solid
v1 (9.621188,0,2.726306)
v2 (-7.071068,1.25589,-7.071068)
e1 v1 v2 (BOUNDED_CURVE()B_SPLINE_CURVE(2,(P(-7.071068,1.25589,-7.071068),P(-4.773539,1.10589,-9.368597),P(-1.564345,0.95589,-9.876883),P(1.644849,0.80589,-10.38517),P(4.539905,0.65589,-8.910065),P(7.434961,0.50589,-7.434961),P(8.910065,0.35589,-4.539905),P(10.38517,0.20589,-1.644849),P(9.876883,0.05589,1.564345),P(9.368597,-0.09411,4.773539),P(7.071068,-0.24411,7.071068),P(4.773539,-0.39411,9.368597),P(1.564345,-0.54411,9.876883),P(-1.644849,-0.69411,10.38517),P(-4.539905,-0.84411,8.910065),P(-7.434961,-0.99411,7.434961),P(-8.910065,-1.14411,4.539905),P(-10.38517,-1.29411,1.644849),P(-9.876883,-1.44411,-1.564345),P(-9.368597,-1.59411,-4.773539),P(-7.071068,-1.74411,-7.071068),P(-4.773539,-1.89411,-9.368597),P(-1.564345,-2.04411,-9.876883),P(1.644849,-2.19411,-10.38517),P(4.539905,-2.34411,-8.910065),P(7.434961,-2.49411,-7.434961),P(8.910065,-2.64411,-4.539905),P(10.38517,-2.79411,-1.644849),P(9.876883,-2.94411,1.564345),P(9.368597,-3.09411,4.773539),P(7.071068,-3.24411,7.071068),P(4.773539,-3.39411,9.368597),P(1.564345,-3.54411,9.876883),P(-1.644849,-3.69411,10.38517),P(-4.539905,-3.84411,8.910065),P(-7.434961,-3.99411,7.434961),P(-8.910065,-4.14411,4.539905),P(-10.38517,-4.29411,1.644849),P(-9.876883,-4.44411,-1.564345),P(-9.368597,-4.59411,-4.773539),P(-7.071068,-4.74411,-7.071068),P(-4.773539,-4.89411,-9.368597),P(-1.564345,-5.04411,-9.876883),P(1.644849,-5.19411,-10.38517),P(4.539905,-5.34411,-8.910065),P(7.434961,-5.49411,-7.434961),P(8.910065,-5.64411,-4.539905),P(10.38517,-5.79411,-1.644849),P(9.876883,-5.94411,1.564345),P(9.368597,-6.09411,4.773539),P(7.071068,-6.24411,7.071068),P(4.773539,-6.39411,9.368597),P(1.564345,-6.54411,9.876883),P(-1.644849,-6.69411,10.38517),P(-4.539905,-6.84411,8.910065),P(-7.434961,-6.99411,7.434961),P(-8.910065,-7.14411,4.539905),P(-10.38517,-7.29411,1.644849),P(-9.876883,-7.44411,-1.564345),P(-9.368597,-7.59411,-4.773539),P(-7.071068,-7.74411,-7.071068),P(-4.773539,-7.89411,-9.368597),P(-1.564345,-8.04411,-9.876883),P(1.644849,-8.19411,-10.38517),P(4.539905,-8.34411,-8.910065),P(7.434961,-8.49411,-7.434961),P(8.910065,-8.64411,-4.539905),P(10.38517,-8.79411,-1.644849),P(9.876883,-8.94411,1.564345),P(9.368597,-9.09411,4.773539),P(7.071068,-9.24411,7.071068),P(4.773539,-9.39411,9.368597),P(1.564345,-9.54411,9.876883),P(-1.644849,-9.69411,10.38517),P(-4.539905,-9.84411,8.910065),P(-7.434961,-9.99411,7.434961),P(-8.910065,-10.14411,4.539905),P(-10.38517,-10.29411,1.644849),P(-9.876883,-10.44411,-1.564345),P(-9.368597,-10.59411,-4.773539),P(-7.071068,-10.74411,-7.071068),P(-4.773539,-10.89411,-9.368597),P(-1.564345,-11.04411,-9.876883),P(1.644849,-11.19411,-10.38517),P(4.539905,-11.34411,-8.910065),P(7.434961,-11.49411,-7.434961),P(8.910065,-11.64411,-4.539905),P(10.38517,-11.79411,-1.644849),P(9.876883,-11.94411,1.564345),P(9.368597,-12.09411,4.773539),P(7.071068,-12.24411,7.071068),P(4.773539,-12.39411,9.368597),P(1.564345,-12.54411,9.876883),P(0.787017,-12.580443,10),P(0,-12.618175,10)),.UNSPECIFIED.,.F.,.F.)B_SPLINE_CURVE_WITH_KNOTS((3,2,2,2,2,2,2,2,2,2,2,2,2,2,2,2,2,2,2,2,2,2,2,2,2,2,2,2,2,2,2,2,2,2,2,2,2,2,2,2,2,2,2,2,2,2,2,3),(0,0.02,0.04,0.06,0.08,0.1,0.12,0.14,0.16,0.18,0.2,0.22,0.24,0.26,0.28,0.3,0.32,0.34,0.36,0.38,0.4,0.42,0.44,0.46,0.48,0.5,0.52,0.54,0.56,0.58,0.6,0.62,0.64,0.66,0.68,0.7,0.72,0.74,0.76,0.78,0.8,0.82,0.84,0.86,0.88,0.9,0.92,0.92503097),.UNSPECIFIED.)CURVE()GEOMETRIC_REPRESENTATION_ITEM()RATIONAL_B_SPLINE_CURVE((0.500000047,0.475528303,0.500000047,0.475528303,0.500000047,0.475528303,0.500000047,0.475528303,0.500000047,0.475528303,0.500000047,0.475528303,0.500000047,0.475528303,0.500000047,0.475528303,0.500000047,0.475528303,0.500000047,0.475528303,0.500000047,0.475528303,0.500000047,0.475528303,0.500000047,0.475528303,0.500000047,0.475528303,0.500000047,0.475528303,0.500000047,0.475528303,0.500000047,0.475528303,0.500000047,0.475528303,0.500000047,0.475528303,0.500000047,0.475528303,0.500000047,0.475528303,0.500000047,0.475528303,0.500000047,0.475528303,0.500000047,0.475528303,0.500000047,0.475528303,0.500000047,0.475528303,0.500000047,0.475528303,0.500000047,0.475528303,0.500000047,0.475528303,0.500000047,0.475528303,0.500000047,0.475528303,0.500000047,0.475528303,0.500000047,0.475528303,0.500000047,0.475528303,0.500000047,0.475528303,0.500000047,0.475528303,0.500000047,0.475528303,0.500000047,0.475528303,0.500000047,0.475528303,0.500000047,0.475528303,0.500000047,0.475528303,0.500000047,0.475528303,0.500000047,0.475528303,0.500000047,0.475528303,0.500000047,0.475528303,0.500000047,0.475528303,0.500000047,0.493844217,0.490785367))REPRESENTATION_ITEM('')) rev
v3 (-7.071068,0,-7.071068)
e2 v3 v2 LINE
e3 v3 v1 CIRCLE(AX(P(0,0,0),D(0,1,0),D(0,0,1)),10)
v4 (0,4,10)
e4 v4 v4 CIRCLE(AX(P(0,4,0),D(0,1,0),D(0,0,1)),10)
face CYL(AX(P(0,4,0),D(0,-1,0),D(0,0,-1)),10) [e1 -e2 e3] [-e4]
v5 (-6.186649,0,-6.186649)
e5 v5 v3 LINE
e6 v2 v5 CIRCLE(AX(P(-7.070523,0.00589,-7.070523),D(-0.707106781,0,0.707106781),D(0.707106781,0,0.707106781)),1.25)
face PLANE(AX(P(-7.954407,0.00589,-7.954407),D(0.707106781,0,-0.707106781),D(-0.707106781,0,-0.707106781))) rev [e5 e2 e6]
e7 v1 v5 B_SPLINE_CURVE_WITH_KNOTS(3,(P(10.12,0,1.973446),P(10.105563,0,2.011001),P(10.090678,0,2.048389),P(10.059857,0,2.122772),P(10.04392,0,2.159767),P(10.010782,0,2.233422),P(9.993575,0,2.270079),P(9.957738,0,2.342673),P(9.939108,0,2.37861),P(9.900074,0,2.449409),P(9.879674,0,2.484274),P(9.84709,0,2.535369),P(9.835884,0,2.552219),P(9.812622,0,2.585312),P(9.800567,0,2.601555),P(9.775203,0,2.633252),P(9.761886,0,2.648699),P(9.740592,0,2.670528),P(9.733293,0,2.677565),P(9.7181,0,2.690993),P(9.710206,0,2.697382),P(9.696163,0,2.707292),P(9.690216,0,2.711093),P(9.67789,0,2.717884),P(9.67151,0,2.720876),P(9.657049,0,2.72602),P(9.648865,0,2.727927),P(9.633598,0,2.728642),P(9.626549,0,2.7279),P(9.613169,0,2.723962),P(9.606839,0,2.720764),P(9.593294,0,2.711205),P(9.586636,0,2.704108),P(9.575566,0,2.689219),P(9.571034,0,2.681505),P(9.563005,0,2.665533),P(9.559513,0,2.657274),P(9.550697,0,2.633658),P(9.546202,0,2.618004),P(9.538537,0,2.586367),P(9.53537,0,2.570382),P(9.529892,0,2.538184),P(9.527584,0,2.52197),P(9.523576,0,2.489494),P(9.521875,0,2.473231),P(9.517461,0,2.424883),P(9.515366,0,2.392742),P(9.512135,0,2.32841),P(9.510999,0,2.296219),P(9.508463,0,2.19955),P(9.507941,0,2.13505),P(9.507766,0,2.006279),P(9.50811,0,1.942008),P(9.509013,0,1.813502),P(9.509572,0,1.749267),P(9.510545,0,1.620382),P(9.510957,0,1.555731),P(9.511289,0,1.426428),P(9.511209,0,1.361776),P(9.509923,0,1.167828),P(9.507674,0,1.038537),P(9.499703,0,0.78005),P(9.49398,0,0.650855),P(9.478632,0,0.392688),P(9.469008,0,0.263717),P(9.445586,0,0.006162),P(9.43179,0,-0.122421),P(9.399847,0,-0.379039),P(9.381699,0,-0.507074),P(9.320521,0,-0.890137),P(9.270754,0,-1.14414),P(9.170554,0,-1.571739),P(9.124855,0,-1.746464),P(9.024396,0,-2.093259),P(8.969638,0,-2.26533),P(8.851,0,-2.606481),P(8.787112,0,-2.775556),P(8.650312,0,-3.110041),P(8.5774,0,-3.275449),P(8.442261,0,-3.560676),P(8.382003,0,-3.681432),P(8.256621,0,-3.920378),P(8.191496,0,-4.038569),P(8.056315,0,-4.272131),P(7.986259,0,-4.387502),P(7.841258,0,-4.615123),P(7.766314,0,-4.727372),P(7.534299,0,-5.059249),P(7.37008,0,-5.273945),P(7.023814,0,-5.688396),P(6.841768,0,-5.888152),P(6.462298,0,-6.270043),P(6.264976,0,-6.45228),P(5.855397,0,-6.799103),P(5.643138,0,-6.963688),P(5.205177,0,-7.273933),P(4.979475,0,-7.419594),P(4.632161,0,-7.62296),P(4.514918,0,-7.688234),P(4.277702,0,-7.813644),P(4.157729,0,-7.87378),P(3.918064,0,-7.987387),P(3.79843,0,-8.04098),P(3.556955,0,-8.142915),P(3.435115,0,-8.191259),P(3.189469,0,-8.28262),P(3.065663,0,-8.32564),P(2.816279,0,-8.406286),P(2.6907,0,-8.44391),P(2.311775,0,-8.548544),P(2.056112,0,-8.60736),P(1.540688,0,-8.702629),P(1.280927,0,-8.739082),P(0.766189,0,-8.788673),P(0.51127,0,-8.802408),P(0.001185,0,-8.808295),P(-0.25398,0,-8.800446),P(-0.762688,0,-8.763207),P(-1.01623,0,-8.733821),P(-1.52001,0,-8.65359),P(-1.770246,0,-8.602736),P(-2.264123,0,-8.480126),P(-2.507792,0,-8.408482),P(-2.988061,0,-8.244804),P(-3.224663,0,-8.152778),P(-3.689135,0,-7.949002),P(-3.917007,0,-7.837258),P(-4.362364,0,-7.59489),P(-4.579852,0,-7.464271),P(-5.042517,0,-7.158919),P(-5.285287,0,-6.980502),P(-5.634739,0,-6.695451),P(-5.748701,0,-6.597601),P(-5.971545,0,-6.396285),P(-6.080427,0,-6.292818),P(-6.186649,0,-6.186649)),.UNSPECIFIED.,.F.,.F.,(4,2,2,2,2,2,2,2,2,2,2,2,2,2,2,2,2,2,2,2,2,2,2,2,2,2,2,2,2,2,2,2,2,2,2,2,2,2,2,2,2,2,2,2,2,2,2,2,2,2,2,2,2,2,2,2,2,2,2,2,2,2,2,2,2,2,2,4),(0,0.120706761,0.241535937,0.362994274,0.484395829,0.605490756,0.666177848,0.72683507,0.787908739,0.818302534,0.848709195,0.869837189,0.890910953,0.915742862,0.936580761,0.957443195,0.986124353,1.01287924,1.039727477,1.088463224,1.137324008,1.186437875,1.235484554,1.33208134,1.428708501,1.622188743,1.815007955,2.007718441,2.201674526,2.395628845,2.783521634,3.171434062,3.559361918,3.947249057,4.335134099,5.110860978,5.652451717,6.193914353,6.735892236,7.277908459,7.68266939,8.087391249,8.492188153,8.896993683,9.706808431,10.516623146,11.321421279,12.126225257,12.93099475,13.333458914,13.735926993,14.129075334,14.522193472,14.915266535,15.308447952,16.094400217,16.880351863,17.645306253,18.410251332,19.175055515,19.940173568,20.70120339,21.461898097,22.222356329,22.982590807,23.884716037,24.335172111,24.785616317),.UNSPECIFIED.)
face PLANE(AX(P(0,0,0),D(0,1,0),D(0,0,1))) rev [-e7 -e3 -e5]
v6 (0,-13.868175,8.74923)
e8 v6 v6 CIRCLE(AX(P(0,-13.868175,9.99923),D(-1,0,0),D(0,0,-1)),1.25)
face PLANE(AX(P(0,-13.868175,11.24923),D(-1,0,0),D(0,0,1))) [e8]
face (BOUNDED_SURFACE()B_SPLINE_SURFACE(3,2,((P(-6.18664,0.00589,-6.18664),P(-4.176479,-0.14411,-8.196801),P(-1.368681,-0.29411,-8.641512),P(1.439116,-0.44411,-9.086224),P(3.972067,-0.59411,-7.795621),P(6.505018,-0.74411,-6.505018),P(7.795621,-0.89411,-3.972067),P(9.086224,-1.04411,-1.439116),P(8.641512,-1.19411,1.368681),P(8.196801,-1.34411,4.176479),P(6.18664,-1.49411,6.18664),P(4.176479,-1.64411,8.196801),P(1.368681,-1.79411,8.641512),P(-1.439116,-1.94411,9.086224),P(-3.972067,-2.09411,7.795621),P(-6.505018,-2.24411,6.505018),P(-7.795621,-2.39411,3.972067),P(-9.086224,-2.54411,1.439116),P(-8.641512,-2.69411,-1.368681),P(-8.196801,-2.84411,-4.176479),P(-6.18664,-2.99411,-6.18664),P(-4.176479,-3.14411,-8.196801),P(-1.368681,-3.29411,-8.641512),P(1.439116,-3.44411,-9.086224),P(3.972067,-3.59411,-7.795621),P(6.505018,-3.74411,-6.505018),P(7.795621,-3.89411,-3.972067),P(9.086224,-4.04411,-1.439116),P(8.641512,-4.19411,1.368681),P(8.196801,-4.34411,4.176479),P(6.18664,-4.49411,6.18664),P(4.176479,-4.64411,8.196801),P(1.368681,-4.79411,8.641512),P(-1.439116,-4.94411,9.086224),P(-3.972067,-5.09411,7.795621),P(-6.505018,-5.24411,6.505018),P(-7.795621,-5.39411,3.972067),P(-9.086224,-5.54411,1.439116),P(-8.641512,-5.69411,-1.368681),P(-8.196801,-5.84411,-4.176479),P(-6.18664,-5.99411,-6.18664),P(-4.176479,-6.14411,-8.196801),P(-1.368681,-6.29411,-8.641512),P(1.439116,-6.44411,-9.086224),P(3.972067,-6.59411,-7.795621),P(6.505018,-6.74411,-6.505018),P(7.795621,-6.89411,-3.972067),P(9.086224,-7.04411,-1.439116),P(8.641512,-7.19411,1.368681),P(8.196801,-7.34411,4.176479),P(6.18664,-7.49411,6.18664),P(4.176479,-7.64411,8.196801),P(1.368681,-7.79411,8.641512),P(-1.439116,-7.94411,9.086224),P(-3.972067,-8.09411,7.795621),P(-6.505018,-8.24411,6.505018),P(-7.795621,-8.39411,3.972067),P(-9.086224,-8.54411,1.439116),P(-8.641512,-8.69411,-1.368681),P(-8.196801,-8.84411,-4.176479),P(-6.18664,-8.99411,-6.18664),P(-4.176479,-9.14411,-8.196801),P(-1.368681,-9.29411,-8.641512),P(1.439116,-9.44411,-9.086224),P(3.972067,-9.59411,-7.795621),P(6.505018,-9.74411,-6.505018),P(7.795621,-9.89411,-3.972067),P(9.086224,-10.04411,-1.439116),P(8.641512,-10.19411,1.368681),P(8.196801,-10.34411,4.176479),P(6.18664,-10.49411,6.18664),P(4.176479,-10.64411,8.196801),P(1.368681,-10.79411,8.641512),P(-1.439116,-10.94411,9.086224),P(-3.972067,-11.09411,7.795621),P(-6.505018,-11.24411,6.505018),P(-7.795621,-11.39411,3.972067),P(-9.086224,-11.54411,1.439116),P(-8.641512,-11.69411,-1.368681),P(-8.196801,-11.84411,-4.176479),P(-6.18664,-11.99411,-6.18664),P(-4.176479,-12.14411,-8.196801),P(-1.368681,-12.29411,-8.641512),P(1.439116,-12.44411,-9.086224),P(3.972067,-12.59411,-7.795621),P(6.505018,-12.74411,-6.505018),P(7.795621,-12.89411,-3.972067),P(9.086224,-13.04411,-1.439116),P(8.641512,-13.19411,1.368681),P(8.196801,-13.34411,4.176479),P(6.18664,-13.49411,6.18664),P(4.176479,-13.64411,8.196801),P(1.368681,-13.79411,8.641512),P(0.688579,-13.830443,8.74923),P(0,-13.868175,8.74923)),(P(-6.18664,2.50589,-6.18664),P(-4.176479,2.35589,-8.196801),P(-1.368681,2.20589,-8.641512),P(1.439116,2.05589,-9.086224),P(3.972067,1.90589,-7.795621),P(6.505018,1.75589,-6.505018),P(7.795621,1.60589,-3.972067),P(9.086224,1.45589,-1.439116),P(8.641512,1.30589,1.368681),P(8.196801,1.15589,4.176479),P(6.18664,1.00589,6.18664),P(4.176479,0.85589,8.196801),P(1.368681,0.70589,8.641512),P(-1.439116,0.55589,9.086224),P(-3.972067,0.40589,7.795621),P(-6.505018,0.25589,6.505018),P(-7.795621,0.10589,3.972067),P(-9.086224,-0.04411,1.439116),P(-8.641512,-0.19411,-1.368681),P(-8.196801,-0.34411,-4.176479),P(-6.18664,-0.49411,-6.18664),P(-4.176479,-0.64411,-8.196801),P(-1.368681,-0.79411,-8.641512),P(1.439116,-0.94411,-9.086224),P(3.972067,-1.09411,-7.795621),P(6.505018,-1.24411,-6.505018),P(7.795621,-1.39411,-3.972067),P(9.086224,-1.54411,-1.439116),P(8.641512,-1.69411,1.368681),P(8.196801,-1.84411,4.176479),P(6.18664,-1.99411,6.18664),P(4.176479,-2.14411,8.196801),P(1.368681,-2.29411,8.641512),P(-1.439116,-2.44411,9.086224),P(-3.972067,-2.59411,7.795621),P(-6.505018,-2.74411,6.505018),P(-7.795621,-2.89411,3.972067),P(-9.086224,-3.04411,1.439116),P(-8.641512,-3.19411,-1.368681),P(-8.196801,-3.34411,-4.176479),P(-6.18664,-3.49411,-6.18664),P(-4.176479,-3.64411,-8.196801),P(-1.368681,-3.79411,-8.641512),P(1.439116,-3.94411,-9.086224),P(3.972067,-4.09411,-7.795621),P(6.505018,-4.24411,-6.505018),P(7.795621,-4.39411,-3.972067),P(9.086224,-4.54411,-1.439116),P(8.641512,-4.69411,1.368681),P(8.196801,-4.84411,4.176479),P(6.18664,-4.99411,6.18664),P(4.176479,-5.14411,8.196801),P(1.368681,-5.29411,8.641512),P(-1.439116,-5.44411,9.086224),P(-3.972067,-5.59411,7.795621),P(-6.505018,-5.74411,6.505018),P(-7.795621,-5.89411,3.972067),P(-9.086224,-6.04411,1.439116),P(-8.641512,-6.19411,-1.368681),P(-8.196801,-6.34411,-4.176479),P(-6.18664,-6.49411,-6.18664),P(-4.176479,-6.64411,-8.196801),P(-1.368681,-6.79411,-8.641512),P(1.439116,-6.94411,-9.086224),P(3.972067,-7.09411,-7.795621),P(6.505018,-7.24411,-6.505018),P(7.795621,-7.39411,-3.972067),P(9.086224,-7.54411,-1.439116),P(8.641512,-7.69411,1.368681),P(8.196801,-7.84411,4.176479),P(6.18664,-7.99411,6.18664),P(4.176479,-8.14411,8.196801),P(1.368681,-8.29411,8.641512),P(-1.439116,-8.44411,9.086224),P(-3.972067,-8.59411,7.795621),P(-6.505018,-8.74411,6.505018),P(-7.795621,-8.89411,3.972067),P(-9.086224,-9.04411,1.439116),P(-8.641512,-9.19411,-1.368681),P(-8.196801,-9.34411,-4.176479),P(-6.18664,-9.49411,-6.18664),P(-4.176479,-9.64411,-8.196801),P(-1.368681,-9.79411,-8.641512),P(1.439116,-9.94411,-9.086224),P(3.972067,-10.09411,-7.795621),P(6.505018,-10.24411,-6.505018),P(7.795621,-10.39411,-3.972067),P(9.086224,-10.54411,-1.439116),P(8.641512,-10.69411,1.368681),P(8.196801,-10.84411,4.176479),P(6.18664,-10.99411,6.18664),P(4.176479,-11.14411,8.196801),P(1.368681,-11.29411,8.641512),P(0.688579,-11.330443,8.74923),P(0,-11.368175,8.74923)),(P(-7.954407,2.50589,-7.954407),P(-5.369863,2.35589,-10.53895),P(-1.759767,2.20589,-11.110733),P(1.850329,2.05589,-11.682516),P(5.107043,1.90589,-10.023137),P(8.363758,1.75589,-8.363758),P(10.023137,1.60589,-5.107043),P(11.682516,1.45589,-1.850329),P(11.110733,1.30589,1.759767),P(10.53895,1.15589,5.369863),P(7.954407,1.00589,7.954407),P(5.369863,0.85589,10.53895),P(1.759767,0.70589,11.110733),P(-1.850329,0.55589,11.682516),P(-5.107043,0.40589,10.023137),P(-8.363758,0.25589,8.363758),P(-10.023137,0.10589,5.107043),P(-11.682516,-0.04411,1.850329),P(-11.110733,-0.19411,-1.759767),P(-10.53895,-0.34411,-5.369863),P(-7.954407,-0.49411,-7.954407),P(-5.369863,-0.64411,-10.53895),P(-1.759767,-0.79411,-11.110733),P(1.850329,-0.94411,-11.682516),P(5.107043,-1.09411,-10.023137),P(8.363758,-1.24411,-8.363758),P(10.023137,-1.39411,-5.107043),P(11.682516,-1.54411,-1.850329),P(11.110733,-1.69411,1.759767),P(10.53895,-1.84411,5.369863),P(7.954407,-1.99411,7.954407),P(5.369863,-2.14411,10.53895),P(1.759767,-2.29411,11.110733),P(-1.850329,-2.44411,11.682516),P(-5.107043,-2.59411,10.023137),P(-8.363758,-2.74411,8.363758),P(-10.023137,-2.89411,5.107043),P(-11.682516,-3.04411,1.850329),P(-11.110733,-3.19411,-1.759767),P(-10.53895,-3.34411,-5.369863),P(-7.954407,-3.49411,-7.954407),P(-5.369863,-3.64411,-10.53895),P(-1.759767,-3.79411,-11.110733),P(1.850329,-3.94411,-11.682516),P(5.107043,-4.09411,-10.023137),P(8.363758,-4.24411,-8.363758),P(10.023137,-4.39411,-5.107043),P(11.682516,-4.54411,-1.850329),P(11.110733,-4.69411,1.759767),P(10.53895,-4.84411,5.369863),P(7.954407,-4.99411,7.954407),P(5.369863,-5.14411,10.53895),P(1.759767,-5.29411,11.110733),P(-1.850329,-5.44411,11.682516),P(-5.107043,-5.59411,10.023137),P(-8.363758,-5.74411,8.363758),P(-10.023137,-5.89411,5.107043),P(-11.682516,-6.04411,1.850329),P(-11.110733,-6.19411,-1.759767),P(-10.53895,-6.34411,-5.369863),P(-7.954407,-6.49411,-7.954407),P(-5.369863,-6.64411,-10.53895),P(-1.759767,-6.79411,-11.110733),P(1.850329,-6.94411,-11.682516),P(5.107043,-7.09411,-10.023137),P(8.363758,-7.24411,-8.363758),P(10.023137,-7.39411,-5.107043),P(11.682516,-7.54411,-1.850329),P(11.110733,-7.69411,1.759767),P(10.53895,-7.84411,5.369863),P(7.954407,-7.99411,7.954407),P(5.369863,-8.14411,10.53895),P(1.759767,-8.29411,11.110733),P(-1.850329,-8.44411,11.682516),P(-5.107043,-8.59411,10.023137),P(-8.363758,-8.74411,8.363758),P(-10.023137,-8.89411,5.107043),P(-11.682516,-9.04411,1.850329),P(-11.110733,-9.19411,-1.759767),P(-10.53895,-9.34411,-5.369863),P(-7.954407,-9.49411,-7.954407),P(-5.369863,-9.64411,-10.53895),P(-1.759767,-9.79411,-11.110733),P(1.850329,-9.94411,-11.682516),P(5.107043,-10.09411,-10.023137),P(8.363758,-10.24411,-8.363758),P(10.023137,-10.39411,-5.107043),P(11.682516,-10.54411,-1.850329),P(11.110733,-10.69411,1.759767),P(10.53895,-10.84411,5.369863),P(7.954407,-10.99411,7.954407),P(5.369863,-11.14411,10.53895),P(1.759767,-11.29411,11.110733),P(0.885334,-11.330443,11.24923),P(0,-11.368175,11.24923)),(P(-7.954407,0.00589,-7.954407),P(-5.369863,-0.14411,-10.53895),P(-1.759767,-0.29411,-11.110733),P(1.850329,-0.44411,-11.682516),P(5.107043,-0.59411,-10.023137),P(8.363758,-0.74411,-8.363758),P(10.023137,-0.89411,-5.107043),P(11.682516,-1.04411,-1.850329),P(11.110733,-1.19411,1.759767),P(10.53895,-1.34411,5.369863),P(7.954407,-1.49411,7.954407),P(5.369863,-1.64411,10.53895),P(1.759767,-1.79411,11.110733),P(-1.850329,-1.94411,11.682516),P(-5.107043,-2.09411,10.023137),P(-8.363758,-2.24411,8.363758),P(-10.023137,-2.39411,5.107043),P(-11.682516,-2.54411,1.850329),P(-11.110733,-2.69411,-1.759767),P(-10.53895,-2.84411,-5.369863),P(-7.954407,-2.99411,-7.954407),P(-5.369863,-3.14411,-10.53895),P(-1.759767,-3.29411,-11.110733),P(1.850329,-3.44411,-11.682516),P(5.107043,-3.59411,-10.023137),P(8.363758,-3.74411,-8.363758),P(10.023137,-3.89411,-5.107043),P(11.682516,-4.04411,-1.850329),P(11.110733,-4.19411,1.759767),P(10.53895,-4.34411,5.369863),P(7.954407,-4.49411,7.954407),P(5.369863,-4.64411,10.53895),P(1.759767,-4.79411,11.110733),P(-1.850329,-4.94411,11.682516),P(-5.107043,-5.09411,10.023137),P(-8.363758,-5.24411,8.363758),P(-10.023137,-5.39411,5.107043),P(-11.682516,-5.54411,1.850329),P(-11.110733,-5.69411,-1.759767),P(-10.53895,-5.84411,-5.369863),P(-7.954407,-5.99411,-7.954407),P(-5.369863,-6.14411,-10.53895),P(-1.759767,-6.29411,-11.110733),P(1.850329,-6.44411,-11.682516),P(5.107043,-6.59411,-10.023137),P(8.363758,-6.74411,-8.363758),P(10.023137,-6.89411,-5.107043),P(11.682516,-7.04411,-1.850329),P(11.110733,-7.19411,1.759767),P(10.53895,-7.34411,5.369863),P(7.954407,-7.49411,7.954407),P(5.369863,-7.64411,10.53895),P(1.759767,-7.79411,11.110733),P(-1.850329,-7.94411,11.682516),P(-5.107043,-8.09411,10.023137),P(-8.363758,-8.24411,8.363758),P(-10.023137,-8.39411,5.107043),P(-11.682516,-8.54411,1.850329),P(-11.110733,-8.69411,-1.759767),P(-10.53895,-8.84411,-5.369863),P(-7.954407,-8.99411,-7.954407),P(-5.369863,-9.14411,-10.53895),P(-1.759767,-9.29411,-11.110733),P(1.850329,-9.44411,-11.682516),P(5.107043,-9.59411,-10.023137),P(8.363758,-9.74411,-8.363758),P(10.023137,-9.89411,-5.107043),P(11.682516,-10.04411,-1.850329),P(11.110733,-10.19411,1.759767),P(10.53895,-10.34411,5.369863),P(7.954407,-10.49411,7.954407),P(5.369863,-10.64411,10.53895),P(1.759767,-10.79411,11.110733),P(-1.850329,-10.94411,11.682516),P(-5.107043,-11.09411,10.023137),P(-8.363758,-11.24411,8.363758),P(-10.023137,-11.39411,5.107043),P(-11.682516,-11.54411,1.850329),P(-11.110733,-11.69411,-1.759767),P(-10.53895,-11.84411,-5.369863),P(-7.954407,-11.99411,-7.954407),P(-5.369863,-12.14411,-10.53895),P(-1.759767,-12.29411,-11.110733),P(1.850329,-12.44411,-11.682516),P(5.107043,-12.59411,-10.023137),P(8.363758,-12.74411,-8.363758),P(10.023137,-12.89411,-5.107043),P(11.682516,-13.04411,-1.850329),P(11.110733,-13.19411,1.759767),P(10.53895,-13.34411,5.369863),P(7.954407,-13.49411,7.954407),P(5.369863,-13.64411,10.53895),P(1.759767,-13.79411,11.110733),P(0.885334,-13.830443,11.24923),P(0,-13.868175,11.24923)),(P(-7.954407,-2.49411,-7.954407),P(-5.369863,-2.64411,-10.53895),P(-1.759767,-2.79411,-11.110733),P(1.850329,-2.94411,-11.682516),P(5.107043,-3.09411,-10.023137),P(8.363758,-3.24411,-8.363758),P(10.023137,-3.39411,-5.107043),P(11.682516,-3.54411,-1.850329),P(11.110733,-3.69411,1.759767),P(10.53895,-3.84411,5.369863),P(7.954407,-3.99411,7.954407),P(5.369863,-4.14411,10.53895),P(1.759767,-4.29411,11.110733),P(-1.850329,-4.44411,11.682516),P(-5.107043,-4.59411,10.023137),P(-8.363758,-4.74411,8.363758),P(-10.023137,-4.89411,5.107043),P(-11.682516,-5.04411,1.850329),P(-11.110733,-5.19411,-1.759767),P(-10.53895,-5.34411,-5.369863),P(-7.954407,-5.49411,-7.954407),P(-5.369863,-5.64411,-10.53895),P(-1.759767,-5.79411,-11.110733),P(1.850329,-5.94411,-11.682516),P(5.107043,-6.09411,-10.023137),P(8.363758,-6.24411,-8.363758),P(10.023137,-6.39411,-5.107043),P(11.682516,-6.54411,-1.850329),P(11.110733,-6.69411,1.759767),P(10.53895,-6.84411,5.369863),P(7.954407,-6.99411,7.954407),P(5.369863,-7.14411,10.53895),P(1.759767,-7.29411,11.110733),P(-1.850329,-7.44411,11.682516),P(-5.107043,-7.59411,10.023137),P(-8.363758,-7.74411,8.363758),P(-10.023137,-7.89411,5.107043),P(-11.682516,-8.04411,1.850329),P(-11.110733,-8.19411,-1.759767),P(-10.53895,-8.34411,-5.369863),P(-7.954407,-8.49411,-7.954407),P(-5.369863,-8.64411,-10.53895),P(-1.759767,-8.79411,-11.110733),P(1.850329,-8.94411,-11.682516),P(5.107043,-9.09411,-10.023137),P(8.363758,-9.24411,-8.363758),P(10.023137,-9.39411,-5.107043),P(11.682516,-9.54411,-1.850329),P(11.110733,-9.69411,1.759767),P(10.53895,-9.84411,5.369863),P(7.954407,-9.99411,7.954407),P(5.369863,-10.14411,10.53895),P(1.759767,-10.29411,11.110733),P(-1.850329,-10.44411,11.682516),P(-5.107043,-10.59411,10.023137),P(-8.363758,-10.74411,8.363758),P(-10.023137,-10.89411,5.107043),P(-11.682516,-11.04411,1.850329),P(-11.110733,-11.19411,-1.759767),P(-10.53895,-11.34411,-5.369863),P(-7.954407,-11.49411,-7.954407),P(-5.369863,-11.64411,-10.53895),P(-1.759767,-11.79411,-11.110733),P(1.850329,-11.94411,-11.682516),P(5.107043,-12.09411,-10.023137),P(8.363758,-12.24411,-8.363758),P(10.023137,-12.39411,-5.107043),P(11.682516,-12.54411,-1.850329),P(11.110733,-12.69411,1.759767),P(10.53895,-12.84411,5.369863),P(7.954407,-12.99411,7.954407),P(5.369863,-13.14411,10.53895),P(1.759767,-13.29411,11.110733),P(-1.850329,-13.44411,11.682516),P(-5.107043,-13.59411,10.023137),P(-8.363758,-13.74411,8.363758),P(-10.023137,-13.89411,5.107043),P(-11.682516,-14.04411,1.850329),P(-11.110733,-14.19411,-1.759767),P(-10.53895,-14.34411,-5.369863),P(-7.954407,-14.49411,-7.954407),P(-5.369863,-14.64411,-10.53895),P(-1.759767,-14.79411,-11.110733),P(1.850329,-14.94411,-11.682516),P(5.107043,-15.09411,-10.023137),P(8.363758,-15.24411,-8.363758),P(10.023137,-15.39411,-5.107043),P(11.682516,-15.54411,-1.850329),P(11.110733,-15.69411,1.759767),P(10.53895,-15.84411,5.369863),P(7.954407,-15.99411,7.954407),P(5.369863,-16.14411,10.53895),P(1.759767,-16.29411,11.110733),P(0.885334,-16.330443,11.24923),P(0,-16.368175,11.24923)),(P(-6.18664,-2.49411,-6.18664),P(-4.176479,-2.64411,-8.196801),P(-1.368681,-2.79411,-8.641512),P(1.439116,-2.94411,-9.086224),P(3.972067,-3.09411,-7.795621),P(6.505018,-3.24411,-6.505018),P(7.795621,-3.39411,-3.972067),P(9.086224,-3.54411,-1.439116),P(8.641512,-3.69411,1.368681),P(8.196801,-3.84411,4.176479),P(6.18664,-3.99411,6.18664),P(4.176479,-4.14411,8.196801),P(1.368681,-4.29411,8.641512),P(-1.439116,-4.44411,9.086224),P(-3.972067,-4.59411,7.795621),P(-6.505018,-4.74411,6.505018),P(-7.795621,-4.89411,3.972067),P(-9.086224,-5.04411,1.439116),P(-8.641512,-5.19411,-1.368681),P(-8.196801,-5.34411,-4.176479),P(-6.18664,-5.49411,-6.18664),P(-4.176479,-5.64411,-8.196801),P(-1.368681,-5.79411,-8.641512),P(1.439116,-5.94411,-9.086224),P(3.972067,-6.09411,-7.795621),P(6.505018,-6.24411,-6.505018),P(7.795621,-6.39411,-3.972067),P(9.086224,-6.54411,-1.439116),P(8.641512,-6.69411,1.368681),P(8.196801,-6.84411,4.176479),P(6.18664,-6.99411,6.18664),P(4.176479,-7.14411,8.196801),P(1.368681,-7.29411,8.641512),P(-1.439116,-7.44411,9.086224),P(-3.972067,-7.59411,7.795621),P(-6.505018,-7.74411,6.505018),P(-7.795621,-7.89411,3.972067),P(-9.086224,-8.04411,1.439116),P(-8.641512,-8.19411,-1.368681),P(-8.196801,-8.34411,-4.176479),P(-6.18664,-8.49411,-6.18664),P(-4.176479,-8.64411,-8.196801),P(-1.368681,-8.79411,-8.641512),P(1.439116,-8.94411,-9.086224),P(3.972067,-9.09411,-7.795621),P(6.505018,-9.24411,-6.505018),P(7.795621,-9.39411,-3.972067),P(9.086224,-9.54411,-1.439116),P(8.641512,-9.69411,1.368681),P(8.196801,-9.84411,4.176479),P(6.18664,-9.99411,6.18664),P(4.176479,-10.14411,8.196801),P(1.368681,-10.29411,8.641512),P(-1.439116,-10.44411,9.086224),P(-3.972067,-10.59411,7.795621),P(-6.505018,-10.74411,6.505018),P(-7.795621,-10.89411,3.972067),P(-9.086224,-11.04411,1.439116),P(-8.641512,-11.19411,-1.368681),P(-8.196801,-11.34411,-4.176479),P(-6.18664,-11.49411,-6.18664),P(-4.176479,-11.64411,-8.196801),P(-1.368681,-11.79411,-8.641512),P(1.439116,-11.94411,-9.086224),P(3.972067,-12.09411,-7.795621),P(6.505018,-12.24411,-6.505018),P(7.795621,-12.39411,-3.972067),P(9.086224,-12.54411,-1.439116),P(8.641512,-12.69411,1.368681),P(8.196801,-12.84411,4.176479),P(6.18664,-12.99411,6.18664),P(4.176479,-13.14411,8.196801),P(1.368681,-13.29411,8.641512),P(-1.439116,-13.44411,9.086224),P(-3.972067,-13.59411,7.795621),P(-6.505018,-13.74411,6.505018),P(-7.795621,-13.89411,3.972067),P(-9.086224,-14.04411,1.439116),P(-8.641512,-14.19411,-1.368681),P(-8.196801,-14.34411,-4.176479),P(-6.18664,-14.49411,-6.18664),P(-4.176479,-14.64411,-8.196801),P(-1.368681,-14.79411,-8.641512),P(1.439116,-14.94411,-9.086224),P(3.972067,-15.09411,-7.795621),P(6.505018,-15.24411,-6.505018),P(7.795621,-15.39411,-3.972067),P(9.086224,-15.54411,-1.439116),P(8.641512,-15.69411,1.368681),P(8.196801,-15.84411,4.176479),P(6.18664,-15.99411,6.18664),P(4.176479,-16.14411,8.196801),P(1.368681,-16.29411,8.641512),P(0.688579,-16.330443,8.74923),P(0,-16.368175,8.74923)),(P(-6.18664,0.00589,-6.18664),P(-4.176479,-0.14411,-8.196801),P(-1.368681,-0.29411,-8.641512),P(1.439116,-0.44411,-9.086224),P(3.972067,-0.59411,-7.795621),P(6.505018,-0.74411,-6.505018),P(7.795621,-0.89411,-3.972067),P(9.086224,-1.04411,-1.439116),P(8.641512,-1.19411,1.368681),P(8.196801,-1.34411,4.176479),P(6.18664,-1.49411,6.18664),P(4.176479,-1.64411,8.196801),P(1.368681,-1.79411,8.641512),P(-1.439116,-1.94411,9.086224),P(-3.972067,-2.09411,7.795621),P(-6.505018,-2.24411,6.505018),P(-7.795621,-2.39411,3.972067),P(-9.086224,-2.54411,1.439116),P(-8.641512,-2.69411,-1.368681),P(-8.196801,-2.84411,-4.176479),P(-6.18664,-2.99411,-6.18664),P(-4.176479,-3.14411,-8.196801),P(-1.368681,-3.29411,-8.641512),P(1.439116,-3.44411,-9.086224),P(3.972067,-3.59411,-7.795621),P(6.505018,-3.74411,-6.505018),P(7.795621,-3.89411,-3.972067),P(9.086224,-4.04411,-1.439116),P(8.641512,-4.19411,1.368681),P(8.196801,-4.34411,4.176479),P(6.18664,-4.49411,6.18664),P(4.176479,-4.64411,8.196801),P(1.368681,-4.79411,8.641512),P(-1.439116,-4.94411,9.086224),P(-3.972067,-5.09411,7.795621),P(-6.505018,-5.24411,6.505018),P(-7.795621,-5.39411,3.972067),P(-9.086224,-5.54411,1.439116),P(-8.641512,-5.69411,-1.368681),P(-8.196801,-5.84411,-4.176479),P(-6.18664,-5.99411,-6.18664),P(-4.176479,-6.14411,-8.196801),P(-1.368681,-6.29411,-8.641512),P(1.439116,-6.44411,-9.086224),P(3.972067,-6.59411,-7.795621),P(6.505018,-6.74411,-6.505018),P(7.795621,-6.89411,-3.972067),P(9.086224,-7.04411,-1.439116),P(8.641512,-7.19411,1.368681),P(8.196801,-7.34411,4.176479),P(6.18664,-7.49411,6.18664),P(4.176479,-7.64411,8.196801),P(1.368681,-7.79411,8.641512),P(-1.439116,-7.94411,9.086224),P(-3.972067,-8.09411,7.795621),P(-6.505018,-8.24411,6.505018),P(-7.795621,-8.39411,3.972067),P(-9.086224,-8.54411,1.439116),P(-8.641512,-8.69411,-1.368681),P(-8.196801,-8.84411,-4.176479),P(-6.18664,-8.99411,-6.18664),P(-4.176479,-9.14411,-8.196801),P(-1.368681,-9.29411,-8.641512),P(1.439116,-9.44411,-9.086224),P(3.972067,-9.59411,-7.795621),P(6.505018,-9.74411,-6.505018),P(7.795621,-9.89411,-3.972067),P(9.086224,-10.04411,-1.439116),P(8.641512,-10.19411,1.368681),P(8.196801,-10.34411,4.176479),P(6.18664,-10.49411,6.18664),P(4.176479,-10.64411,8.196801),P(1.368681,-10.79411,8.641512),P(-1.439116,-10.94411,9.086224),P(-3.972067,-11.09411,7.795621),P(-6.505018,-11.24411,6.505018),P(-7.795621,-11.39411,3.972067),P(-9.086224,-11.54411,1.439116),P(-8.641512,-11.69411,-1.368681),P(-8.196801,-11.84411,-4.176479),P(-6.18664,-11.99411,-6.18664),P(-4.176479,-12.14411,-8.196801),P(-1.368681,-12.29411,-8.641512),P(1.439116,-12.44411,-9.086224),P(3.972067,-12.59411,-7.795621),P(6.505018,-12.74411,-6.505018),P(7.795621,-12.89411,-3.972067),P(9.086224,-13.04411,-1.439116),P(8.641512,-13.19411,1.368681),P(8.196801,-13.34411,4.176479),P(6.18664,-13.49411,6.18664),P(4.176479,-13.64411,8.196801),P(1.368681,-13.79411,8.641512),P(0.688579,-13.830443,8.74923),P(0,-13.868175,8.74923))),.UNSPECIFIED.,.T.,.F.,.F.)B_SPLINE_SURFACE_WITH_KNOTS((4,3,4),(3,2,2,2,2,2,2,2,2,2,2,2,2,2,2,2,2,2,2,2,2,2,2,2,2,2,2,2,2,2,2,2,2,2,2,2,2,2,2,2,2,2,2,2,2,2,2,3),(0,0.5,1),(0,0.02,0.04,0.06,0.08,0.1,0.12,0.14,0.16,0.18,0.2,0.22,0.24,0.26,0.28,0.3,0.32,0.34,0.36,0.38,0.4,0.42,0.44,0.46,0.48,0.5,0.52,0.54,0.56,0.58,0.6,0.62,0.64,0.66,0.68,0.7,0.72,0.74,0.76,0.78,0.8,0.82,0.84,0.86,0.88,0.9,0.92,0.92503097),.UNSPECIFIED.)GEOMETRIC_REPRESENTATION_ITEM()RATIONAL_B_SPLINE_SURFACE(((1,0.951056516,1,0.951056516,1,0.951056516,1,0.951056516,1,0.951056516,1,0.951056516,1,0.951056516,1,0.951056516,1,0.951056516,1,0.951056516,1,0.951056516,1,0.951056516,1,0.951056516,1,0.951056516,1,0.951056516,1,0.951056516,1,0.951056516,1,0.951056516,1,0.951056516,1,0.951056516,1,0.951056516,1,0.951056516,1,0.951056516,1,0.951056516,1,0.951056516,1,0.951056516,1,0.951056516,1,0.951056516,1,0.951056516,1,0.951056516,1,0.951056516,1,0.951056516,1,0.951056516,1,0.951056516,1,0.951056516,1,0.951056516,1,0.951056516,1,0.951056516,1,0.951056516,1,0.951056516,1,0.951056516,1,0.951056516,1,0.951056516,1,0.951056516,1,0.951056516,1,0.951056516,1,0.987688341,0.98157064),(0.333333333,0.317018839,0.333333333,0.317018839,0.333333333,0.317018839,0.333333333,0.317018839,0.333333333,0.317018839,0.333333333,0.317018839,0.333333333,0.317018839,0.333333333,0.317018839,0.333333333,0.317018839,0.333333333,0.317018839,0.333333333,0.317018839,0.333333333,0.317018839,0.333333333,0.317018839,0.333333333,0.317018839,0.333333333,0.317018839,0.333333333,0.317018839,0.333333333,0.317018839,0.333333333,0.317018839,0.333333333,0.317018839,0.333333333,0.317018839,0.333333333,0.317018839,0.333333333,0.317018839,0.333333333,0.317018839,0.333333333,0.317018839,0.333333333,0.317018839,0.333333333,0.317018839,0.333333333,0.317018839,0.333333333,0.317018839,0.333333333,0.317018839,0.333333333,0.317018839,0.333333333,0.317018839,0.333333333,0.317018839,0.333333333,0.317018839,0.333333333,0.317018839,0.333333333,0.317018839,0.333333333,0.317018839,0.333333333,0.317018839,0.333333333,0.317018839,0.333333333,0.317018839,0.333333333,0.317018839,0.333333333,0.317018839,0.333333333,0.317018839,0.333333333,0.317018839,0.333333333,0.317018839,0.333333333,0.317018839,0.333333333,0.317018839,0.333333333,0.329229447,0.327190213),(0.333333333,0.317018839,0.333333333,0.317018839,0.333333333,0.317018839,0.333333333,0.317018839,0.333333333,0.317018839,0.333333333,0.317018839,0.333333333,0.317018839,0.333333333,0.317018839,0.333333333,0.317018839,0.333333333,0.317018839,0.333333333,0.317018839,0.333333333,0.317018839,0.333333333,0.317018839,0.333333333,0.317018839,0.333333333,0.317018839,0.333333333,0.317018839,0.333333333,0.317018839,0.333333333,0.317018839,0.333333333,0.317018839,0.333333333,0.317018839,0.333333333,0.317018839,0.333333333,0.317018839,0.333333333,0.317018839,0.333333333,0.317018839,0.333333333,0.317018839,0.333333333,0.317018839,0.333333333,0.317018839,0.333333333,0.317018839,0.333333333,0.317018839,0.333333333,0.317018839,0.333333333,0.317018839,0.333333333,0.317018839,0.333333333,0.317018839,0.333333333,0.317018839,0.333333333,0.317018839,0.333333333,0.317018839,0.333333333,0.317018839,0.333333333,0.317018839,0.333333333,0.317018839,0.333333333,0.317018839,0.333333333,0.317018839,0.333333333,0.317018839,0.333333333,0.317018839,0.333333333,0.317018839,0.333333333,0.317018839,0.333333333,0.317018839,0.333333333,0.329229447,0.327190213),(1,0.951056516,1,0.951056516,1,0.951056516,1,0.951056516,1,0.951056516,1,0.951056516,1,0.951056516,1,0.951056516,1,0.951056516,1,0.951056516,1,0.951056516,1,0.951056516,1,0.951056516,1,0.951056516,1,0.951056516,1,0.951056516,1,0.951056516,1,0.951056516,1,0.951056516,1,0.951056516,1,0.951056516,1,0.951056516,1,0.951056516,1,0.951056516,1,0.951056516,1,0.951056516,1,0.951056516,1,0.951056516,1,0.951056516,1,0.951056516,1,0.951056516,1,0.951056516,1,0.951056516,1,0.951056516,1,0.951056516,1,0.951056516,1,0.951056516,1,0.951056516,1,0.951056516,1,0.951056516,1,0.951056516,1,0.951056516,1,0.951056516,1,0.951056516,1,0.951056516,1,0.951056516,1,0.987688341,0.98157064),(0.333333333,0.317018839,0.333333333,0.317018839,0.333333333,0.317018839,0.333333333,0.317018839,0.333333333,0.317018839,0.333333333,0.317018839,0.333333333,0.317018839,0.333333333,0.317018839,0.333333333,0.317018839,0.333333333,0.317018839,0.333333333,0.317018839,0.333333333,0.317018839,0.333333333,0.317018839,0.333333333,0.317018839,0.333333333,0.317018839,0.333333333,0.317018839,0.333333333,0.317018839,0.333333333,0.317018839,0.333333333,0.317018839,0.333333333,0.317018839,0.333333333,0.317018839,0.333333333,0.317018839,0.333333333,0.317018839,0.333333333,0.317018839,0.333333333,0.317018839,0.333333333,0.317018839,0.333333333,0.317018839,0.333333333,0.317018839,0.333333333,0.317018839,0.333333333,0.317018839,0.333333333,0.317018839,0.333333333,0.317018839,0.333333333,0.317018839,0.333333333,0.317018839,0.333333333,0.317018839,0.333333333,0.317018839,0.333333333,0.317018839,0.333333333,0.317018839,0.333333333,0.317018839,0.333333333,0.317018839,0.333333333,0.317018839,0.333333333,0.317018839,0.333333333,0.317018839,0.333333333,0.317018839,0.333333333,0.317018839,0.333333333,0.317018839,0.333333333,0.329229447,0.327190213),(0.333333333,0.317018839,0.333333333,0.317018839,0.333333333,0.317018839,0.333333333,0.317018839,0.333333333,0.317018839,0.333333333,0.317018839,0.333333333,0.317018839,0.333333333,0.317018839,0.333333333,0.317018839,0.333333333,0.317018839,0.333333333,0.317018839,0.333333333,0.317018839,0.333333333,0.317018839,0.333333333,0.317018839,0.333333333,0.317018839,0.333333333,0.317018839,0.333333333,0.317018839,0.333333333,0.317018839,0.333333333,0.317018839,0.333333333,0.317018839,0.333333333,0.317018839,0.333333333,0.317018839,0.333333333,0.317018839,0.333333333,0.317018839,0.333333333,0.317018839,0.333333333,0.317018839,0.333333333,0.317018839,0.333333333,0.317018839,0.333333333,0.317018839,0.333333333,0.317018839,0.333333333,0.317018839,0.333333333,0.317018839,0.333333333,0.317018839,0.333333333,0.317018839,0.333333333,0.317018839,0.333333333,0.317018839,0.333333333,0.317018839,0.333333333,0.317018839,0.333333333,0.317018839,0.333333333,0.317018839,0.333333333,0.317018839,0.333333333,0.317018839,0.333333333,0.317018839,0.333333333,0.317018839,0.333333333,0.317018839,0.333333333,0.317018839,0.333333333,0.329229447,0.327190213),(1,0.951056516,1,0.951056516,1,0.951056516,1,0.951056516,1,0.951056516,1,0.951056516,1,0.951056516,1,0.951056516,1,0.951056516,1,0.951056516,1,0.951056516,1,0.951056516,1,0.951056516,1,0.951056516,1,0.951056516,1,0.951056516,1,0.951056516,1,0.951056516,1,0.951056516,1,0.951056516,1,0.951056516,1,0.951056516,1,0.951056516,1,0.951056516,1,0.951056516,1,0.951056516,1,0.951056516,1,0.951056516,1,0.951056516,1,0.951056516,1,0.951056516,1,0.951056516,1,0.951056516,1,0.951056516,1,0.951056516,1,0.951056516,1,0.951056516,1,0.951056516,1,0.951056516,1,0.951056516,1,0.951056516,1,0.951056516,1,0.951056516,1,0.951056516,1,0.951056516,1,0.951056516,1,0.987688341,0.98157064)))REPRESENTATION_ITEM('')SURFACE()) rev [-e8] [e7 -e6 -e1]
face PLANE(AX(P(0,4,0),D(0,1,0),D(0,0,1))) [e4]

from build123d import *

# Parameters (mm, degrees)
SKETCH_1_R      = 10
EXTRUDE_1_DEPTH = 4
SWEEP_1_PITCH   = 3


with BuildPart() as part:
    # 草图1 → 凸台-拉伸1 (new body)
    with BuildSketch(Plane(origin=(0, 0, 0), x_dir=(1, 0, 0), z_dir=(0, 1, 0))):
        with Locations(Location((0, 0, 0), (0, 0, 270))):
            Circle(SKETCH_1_R)
    extrude(amount=EXTRUDE_1_DEPTH)

    # 扫描1: arcs per turn and ends read off the stored shape
    # 扫描1: the profile of 草图4 screwed along a right-hand helix through 4.625 turns, 10 arcs to a turn; built about Z, then put on its axis
    sweep_1_z = Axis((0, 0, 0), (0, 0, 1))
    sweep_1_corners = [(8.749229636, 0, -0.00589028), (9.999229636, 0, -1.25589028), (11.249229636, 0, -0.00589028), (9.999229636, 0, 1.24410972)]
    with BuildLine(mode=Mode.PRIVATE) as sweep_1_profile:
        ThreePointArc((8.749229636, 0, -0.00589028), (9.115346159, 0, -0.889773756), (9.999229636, 0, -1.25589028))
        ThreePointArc((9.999229636, 0, -1.25589028), (10.883113112, 0, -0.889773756), (11.249229636, 0, -0.00589028))
        ThreePointArc((11.249229636, 0, -0.00589028), (10.883113112, 0, 0.877993197), (9.999229636, 0, 1.24410972))
        ThreePointArc((9.999229636, 0, 1.24410972), (9.115346159, 0, 0.877993197), (8.749229636, 0, -0.00589028))
    sweep_1_cap = Face(sweep_1_profile.wire())
    sweep_1_arcs = [((8.749229636, 0, -0.00589028), (8.749229636, 0, -1.25589028), (9.999229636, 0, -1.25589028), (1, 0.7071067811865476, 1)), ((9.999229636, 0, -1.25589028), (11.249229636, 0, -1.25589028), (11.249229636, 0, -0.00589028), (1, 0.7071067811865476, 1)), ((11.249229636, 0, -0.00589028), (11.249229636, 0, 1.24410972), (9.999229636, 0, 1.24410972), (1, 0.7071067811865476, 1)), ((9.999229636, 0, 1.24410972), (8.749229636, 0, 1.24410972), (8.749229636, 0, -0.00589028), (1, 0.7071067811865476, 1))]  # start, shoulder, end, weights
    sweep_1_turn_angles = [0, 18, 36, 54, 72, 90, 108, 126, 144, 162, 180, 198, 216, 234, 252, 270, 288, 306, 324, 342, 360]
    sweep_1_turn_weights = [1, 0.9510565162951535, 1, 0.9510565162951535, 1, 0.9510565162951535, 1, 0.9510565162951535, 1, 0.9510565162951535, 1, 0.9510565162951535, 1, 0.9510565162951535, 1, 0.9510565162951535, 1, 0.9510565162951535, 1, 0.9510565162951535, 1]
    sweep_1_turn_sides = [Face.make_bezier_surface([[Vector(p[j][0], p[j][1], 0).rotate(sweep_1_z, sweep_1_turn_angles[2 * i + k]) / sweep_1_turn_weights[2 * i + k] + Vector(0, 0, p[j][2] + SWEEP_1_PITCH * sweep_1_turn_angles[2 * i + k] / 360) for k in range(3)] for j in range(3)], [[p[3][j] * sweep_1_turn_weights[2 * i + k] for k in range(3)] for j in range(3)]) for p in sweep_1_arcs for i in range(10)]
    sweep_1_last_angles = [1440, 1458, 1476, 1494, 1512, 1530, 1548, 1566, 1584, 1602, 1620, 1638, 1656, 1660.5, 1665]
    sweep_1_last_weights = [1, 0.9510565162951535, 1, 0.9510565162951535, 1, 0.9510565162951535, 1, 0.9510565162951535, 1, 0.9510565162951535, 1, 0.9510565162951535, 1, 0.996917333733128, 1]
    sweep_1_last_sides = [Face.make_bezier_surface([[Vector(p[j][0], p[j][1], 0).rotate(sweep_1_z, sweep_1_last_angles[2 * i + k]) / sweep_1_last_weights[2 * i + k] + Vector(0, 0, p[j][2] + SWEEP_1_PITCH * sweep_1_last_angles[2 * i + k] / 360) for k in range(3)] for j in range(3)], [[p[3][j] * sweep_1_last_weights[2 * i + k] for k in range(3)] for j in range(3)]) for p in sweep_1_arcs for i in range(7)]
    sweep_1 = Plane(origin=(0, 0, 0), x_dir=(-0.7071067811865537, 0, -0.7071067811865414), z_dir=(0, -1, 0)) * Solid(Shell([*[p.moved(Location((0, 0, SWEEP_1_PITCH * i))) for i in range(4) for p in sweep_1_turn_sides], *sweep_1_last_sides, sweep_1_cap, sweep_1_cap.rotate(sweep_1_z, 1665).moved(Location((0, 0, SWEEP_1_PITCH * 1665 / 360)))]))
    add(sweep_1)


solid = part.part
